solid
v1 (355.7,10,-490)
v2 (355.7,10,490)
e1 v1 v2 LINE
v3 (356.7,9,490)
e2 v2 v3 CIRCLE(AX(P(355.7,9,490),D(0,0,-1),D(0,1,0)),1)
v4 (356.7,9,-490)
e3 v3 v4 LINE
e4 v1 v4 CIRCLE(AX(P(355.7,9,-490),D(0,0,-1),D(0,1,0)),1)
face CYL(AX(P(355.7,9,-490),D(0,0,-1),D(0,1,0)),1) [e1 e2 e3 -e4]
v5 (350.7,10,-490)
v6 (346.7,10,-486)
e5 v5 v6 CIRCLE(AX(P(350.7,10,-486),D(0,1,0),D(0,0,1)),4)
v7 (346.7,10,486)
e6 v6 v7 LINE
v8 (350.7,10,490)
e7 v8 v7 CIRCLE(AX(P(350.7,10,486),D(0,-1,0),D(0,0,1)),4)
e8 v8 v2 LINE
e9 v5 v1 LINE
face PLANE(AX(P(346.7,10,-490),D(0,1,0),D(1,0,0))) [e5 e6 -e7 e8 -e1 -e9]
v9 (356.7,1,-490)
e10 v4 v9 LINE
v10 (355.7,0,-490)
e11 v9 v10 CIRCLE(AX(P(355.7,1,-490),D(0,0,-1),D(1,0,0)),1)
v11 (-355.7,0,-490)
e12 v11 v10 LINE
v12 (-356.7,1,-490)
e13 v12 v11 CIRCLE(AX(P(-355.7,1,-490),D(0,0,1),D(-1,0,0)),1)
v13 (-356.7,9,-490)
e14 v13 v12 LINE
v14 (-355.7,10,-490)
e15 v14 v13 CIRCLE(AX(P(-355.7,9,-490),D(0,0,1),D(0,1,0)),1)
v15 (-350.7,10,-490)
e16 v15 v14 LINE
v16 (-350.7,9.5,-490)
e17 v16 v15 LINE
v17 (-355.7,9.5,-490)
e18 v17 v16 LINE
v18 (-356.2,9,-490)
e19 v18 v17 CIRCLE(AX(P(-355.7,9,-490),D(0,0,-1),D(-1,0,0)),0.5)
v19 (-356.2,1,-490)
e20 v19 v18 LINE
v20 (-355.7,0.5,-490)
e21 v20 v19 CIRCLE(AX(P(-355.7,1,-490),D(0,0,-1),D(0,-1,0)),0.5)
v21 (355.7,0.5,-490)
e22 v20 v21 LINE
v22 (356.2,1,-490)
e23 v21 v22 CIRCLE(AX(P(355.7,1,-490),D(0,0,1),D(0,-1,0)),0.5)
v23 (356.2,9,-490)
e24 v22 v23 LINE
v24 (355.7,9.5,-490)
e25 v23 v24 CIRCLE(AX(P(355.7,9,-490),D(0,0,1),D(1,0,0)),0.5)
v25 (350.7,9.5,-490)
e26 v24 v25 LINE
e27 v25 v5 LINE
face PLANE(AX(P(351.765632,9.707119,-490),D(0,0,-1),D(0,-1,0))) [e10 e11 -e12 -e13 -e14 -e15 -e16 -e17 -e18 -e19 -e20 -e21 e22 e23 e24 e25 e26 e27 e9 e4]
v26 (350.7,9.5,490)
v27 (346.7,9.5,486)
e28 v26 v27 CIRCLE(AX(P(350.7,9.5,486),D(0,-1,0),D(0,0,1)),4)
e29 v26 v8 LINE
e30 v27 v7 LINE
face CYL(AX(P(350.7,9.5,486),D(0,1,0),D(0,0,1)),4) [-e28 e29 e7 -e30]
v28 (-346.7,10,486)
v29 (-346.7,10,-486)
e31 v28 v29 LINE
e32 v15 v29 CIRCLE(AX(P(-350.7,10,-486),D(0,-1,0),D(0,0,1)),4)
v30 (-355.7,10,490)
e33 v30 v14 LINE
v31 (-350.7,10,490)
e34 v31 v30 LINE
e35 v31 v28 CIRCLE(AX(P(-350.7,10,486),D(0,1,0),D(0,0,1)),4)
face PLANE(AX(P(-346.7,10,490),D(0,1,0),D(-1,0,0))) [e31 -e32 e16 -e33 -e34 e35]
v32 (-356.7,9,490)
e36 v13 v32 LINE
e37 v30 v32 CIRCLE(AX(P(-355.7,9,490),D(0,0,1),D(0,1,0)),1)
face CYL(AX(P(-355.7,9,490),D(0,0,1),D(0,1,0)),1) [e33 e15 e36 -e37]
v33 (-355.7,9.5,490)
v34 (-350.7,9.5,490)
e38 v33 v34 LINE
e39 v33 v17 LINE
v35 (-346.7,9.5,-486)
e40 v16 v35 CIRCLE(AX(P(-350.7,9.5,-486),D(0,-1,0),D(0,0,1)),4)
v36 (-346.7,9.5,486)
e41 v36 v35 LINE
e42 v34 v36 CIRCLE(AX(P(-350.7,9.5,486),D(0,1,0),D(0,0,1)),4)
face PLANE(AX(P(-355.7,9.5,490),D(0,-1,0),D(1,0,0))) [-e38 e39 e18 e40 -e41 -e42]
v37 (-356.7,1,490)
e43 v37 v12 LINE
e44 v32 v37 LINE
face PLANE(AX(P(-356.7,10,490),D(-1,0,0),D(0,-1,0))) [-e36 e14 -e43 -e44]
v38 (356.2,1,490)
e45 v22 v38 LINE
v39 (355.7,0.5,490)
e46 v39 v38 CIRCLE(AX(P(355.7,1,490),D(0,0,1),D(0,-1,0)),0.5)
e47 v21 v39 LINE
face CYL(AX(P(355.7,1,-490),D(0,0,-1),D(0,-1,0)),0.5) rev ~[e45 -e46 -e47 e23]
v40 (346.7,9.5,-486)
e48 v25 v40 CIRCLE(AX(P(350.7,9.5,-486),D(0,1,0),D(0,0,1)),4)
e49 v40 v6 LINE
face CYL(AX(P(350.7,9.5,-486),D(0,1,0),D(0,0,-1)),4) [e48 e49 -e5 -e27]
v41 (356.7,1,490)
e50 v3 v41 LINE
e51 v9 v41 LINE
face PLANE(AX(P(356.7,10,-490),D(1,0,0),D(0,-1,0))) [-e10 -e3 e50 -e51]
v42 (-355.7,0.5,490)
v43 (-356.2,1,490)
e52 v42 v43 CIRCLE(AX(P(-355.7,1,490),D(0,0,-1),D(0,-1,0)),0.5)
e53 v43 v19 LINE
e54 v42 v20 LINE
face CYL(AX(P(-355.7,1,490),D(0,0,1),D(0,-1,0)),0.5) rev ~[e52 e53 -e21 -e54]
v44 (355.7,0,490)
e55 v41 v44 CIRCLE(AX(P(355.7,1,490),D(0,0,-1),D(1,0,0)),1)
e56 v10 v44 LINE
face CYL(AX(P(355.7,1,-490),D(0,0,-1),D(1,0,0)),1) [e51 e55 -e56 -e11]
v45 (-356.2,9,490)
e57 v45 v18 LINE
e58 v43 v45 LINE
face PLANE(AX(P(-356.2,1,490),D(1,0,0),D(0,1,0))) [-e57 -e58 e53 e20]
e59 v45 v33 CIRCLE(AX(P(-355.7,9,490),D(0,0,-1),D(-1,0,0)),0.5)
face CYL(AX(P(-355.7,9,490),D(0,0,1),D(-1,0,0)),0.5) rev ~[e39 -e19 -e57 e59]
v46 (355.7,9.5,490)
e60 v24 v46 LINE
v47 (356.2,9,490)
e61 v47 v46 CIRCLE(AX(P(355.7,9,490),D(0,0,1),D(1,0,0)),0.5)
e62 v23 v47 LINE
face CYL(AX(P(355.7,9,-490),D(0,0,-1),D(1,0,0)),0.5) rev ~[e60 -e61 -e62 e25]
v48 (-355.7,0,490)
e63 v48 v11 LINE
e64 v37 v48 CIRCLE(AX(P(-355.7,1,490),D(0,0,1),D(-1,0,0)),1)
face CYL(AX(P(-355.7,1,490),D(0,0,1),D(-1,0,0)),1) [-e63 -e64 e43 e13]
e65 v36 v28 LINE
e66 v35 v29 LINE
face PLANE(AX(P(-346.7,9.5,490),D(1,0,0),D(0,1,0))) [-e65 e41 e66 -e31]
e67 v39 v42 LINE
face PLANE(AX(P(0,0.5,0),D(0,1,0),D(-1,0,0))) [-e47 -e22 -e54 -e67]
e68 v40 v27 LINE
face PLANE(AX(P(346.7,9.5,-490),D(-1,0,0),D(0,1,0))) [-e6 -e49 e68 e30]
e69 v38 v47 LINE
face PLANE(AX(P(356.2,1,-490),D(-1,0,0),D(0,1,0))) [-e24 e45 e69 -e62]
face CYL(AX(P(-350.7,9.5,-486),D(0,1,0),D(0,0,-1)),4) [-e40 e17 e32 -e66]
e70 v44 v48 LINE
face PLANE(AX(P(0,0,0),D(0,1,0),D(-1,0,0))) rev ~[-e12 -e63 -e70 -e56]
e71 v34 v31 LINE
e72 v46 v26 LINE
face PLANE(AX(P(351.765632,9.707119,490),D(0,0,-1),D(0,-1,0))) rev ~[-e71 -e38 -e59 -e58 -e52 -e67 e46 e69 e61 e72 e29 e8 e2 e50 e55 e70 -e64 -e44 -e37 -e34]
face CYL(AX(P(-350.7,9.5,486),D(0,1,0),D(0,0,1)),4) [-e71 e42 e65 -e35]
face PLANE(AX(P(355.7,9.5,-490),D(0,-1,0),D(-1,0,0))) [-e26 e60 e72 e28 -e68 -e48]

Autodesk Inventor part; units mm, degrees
ref_plane "YZ Plane" through (0, 0, 0) normal (1, 0, 0) x (0, 1, 0)
ref_plane "XZ Plane" through (0, 0, 0) normal (0, 1, 0) x (-1, 0, 0)
ref_plane "XY Plane" through (0, 0, 0) normal (0, 0, 1) x (1, 0, 0)
sketch "Sketch6" plane through (0, 0, 0) normal (0, 1, 0) x (-1, 0, 0)
  line L0 (356.7, -490) -> (-356.7, -490)
  line L1 (-356.7, -490) -> (-356.7, 490)
  line L2 (-356.7, 490) -> (356.7, 490)
  line L3 (356.7, 490) -> (356.7, -490)
  line L4 (356.7, -490) -> (-356.7, 490) construction
  line L5 (-356.7, -490) -> (356.7, 490) construction
  point P0 (0, 0)
  dimension "d52" = 713.4
  dimension "d53" = 980
extrude "Plate2" add sketch "Sketch6" along normal blind 0.5
sketch "Sketch11" plane through (-356.2, 0, 490) normal (-1, 0, 0) x (0, -1, 0)
  line L0 (0, -980) -> (0, 0)
  line L1 (0, 0) -> (-10, 0)
  line L2 (-10, 0) -> (-10, -980)
  line L3 (-10, -980) -> (0, -980)
edge flange "Flange2" height 10 angle 90 thickness 0.5 bend radius 0.5 thickness toward (-1, 0, 0) relief tear relief width 0.5 relief depth 0.25 edges at (-356.7, 0.5, 0) wall of the first edge with corners at (-356.2, 0, -490) (-356.2, 0, 490) (-356.2, 10, 490) (-356.2, 10, -490)
bend "Bend3"
corner "Corner3"
sketch "Sketch12" plane through (-356.7, 9.5, 490) normal (0, 1, 0) x (-1, 0, 0)
  line L0 (0, -980) -> (0, 0)
  line L1 (0, 0) -> (-10, 0)
  line L2 (-10, 0) -> (-10, -980)
  line L3 (-10, -980) -> (0, -980)
edge flange "Flange3" height 10 angle 90 thickness 0.5 bend radius 0.5 thickness toward (0, 1, 0) relief tear relief width 0.5 relief depth 0.25 edges at (-356.2, 10, 0) wall of the first edge with corners at (-356.7, 9.5, -490) (-356.7, 9.5, 490) (-346.7, 9.5, 490) (-346.7, 9.5, -490)
bend "Bend4"
corner "Corner4"
sketch "Sketch13" plane through (356.2, 0, -490) normal (1, 0, 0) x (0, 1, 0)
  line L0 (0, 980) -> (0, 0)
  line L1 (0, 0) -> (10, 0)
  line L2 (10, 0) -> (10, 980)
  line L3 (10, 980) -> (0, 980)
edge flange "Flange4" height 10 angle 90 thickness 0.5 bend radius 0.5 thickness toward (1, 0, 0) relief tear relief width 0.5 relief depth 0.25 edges at (356.7, 0.5, 0) wall of the first edge with corners at (356.2, 0, 490) (356.2, 0, -490) (356.2, 10, -490) (356.2, 10, 490)
bend "Bend5"
corner "Corner5"
sketch "Sketch14" plane through (356.7, 9.5, -490) normal (0, 1, 0) x (-1, 0, 0)
  line L0 (0, 980) -> (0, 0)
  line L1 (0, 0) -> (10, 0)
  line L2 (10, 0) -> (10, 980)
  line L3 (10, 980) -> (0, 980)
edge flange "Flange5" height 10 angle 90 thickness 0.5 bend radius 0.5 thickness toward (0, 1, 0) relief tear relief width 0.5 relief depth 0.25 edges at (356.2, 10, 0) wall of the first edge with corners at (356.7, 9.5, 490) (356.7, 9.5, -490) (346.7, 9.5, -490) (346.7, 9.5, 490)
bend "Bend6"
corner "Corner6"
fillet "Corner Round1" radius 4 4 edges at (346.7, 9.75, -490) (346.7, 9.75, 490) (-346.7, 9.75, -490) (-346.7, 9.75, 490)
equation "\"d52\" = ЖАБРЫ_базовая_ширина - 2 * ЖАБРЫ_шаг_листов"
equation "\"d53\" = ЖАБРЫ_базовая_длина_кор_лист"
equation "\"d54\" = Thickness"
equation "\"d84\" = BendReliefWidth"
equation "\"d85\" = BendReliefDepth"
equation "\"d86\" = MinimumRemnant"
equation "\"d87\" = TransitionRadius"
equation "\"d90\" = BendRadius"
equation "\"d91\" = CornerReliefSize"
equation "\"d92\" = GapSize"
equation "\"d93\" = JacobiRadiusSize"
equation "\"d94\" = BendReliefWidth"
equation "\"d95\" = BendReliefDepth"
equation "\"d96\" = MinimumRemnant"
equation "\"d97\" = TransitionRadius"
equation "\"d100\" = BendRadius"
equation "\"d101\" = CornerReliefSize"
equation "\"d102\" = GapSize"
equation "\"d103\" = JacobiRadiusSize"
equation "\"d104\" = BendReliefWidth"
equation "\"d105\" = BendReliefDepth"
equation "\"d106\" = MinimumRemnant"
equation "\"d107\" = TransitionRadius"
equation "\"d110\" = BendRadius"
equation "\"d111\" = CornerReliefSize"
equation "\"d112\" = GapSize"
equation "\"d113\" = JacobiRadiusSize"
equation "\"d114\" = BendReliefWidth"
equation "\"d115\" = BendReliefDepth"
equation "\"d116\" = MinimumRemnant"
equation "\"d117\" = TransitionRadius"
equation "\"d120\" = BendRadius"
equation "\"d121\" = CornerReliefSize"
equation "\"d122\" = GapSize"
equation "\"d123\" = JacobiRadiusSize"
equation "\"BendRadius\" = Thickness"
equation "\"BendReliefWidth\" = Thickness"
equation "\"BendReliefDepth\" = 0.5 * Thickness"
equation "\"CornerReliefSize\" = 4 * Thickness"
equation "\"MinimumRemnant\" = 2 * Thickness"
equation "\"TransitionRadius\" = BendRadius"
equation "\"JacobiRadiusSize\" = BendRadius"
equation "\"GapSize\" = Thickness"
equation "\"ЖАБРЫ_базовая_ширина\" = 915"
equation "\"ЖАБРЫ_шаг_листов\" = 100.8"
equation "\"ЖАБРЫ_базовая_длина_кор_лист\" = 980"
equation "\"Thickness\" = 0.5"
properties part number "MSC 806 SHEET GILLS" material "Stainless Steel"
